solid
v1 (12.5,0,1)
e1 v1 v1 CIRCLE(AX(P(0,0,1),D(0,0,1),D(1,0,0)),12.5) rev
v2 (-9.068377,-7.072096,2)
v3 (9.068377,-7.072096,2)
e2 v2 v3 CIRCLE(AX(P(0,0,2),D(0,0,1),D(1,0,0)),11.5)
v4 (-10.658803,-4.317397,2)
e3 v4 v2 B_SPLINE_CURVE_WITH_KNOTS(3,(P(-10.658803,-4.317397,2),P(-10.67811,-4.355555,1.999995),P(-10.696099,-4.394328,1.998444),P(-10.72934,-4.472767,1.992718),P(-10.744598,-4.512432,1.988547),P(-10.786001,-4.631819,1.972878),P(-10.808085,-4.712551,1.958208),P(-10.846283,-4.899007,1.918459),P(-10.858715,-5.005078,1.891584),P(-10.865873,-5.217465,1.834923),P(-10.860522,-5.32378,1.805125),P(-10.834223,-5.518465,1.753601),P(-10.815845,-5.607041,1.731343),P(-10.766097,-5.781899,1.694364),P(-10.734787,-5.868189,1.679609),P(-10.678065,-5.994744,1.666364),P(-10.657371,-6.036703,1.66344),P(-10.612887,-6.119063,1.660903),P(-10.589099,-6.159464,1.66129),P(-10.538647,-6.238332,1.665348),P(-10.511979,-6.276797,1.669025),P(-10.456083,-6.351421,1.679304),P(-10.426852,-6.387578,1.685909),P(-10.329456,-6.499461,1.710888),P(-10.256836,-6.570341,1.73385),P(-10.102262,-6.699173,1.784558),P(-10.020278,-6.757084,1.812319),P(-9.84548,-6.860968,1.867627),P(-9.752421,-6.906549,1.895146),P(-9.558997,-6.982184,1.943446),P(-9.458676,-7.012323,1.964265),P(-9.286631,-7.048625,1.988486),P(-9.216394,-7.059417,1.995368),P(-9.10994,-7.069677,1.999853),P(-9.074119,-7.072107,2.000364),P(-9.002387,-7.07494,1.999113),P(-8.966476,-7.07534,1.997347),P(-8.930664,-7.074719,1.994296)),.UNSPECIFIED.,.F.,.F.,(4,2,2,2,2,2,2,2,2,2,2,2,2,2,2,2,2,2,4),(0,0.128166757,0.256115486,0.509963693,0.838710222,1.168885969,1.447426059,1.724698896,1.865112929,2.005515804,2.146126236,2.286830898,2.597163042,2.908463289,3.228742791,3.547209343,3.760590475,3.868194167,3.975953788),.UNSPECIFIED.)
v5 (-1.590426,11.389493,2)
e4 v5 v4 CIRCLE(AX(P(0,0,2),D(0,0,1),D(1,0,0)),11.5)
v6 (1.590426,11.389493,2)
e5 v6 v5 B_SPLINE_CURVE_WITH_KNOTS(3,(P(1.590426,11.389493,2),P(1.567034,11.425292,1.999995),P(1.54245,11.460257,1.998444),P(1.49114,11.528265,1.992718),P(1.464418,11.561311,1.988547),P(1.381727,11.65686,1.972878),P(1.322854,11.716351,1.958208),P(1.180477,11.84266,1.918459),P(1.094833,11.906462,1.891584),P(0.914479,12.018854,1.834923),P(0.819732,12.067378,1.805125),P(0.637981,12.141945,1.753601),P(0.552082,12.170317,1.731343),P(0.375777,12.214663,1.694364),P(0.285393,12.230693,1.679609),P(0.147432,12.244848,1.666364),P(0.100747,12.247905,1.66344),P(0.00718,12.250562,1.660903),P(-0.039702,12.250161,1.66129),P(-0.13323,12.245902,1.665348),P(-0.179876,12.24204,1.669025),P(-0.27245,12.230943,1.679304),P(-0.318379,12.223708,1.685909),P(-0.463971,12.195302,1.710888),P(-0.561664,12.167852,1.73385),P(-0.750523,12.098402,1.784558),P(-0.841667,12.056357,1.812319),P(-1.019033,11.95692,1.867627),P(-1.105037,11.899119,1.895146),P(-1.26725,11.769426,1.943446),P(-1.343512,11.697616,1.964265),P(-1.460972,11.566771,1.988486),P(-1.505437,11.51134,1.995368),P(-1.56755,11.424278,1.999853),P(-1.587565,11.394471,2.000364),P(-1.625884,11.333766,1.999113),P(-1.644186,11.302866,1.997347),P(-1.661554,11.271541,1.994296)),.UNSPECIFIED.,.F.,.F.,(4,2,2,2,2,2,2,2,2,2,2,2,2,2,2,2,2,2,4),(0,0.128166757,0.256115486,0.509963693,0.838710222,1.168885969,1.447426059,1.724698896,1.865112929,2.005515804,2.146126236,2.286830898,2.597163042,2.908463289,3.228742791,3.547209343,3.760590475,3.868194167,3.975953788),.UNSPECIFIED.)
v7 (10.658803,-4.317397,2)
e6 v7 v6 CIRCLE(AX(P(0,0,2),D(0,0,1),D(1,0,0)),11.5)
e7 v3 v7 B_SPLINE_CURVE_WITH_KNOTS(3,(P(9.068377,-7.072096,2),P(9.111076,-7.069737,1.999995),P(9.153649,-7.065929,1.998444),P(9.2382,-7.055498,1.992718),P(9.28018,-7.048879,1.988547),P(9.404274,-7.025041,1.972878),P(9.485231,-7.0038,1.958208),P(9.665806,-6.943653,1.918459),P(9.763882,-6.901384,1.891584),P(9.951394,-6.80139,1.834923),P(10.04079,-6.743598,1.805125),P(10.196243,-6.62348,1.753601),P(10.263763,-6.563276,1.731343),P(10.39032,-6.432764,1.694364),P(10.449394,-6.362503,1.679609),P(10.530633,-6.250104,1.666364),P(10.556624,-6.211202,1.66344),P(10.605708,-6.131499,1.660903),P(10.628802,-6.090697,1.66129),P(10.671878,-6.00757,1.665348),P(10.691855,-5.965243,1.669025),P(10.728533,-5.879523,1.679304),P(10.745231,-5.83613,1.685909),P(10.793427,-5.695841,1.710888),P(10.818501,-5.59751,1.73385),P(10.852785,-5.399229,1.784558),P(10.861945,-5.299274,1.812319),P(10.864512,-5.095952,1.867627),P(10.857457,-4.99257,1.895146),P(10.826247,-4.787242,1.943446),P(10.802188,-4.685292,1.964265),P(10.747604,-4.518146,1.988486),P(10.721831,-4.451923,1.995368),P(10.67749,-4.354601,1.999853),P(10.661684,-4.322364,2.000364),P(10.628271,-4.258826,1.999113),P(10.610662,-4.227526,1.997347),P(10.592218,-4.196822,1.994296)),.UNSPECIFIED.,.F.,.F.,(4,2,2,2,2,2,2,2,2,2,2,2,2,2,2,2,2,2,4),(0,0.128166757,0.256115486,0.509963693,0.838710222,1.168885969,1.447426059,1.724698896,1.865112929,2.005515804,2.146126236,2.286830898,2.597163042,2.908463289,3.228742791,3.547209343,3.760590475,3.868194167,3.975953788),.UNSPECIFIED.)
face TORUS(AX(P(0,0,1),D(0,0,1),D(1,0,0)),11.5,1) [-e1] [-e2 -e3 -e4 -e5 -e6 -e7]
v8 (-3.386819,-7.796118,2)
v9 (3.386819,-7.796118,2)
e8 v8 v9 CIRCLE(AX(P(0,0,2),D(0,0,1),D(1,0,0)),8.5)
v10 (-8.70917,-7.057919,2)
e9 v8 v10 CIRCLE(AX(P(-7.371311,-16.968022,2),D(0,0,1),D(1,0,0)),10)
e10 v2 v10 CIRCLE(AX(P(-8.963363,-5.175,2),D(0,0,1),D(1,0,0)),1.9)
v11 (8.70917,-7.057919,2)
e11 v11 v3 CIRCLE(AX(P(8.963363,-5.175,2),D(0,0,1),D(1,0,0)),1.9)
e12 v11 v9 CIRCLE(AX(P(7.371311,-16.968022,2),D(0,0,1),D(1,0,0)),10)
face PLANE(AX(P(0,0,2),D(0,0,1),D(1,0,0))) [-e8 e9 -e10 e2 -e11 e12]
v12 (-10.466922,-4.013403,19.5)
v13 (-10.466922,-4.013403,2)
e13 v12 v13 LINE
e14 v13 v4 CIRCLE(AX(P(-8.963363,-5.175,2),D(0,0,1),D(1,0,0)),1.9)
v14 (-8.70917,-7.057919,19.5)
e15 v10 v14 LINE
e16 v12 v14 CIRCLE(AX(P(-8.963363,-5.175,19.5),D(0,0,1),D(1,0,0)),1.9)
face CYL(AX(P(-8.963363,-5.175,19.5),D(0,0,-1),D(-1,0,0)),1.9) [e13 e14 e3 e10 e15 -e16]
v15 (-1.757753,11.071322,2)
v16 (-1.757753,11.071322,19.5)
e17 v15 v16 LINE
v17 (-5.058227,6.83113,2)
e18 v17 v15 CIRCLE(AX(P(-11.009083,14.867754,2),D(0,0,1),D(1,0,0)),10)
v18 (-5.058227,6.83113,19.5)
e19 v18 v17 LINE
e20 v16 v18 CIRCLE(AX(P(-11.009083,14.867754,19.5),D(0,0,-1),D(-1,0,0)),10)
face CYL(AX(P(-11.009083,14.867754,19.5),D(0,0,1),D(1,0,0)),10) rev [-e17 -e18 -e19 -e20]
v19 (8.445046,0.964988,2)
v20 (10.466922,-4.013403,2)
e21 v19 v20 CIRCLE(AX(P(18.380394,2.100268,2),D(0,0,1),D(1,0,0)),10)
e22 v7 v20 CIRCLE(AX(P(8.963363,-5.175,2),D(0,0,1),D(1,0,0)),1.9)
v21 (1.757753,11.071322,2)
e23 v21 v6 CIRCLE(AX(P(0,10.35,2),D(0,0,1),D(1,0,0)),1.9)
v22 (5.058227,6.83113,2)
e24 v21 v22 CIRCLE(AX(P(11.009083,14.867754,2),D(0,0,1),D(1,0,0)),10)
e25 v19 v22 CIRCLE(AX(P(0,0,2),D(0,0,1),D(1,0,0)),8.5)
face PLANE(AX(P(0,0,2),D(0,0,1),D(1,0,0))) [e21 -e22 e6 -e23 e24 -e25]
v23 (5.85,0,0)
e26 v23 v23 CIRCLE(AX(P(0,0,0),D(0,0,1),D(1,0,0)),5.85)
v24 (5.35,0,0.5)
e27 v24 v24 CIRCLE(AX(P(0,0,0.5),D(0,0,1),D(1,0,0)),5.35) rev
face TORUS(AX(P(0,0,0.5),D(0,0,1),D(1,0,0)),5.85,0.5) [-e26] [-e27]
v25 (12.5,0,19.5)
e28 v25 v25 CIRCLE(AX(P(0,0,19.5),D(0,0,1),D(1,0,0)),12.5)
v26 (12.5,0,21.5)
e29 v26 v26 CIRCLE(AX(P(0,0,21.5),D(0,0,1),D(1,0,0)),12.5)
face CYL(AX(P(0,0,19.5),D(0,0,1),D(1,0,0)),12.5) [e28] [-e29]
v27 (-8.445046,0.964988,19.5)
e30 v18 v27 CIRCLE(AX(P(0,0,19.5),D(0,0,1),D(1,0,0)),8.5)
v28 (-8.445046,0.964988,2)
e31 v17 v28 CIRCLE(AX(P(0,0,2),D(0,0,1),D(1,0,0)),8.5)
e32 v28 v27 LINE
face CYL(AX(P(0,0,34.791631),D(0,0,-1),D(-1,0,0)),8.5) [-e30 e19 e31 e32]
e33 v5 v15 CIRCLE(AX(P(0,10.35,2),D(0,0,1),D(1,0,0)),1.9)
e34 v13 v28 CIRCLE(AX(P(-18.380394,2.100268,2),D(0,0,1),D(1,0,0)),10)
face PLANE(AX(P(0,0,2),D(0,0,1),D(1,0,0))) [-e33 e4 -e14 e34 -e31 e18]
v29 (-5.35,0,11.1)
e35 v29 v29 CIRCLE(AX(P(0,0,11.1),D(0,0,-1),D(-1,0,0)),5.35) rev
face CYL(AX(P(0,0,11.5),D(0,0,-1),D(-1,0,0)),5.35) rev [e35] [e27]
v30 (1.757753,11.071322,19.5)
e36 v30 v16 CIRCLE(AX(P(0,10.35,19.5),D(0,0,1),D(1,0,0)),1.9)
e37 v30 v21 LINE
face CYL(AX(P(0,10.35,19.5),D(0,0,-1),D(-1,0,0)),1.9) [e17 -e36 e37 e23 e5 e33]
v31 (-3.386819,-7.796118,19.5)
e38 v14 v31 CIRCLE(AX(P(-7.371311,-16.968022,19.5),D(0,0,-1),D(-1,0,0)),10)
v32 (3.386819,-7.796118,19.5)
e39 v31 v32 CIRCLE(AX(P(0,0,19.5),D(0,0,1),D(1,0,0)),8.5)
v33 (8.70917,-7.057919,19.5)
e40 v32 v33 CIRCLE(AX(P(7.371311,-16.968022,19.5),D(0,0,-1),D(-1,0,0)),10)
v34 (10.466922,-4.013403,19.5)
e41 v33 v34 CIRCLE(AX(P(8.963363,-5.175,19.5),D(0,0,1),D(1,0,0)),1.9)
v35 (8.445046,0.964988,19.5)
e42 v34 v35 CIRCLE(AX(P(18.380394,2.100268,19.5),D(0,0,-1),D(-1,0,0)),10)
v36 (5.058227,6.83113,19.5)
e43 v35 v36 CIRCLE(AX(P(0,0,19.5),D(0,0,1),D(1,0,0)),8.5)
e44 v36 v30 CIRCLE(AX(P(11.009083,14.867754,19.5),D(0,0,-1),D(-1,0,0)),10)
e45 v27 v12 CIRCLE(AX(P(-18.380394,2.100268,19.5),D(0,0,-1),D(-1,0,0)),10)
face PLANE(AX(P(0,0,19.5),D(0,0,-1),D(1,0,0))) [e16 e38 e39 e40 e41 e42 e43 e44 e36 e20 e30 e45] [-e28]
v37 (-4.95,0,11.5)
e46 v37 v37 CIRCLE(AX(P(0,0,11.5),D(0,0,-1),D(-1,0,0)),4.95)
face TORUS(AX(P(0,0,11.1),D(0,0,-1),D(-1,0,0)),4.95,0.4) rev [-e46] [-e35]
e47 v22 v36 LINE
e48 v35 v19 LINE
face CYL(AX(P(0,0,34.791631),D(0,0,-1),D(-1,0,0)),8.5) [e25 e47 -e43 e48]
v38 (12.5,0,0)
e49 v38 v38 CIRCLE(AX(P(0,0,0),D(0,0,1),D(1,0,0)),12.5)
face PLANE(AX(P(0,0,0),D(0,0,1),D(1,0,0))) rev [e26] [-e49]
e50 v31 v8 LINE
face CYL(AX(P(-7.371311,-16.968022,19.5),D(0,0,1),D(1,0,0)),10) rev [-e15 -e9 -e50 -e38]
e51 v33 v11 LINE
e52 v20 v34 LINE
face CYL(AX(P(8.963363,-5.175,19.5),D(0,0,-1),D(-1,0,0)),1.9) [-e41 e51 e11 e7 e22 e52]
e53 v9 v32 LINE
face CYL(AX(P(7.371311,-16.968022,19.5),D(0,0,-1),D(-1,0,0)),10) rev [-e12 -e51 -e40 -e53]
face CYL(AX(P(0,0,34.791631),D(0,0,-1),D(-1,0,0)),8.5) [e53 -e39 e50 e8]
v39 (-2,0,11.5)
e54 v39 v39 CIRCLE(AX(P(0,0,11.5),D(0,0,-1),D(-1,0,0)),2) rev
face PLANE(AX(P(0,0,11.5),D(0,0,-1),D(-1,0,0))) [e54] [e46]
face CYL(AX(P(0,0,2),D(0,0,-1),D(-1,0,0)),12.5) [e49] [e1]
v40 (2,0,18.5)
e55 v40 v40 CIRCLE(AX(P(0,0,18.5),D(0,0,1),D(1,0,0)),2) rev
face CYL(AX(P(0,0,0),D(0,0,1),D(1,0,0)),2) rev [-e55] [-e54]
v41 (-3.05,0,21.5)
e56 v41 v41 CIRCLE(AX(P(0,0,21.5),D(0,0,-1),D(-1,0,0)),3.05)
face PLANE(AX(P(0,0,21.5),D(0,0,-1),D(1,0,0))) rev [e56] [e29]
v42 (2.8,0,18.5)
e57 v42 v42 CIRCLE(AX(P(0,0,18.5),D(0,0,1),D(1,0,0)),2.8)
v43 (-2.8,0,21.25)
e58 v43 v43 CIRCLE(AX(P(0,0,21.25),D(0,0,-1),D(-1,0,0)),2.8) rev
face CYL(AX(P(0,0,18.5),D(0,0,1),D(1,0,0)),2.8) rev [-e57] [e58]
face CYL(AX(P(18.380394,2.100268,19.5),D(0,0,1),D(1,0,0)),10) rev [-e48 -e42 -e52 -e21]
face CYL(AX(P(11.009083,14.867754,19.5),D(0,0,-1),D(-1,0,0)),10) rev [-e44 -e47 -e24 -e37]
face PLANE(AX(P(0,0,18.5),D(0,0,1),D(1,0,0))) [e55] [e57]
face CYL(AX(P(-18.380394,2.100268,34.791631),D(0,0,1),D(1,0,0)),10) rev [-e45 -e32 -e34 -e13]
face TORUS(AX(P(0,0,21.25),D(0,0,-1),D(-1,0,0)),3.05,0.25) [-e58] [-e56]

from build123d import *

# Parameters (mm, degrees)
SKETCH1_R           = 12.5
BOSS_EXTRUDE1_DEPTH = 2
SKETCH2_R           = 1.9
BOSS_EXTRUDE2_DEPTH = 17.5
SKETCH3_R           = 8.5
BOSS_EXTRUDE3_DEPTH = 8.75
SKETCH4_R           = 2
CUT_EXTRUDE1_DEPTH  = 28.834331319
SKETCH5_R           = 5.35
CUT_EXTRUDE2_DEPTH  = 11.5
FILLET1_R           = 0.5
SKETCH6_R           = 2.8
CUT_EXTRUDE3_DEPTH  = 3
FILLET2_R           = 0.25
FILLET3_R           = 10
FILLET4_R           = 10
FILLET5_R           = 10
FILLET6_R           = 10
FILLET7_R           = 10
FILLET8_R           = 10
FILLET9_R           = 1
FILLET10_R          = 0.4


with BuildPart() as part:
    # Sketch1 → Boss-Extrude1 (new body)
    with BuildSketch(Plane(origin=(0, 0, 0), x_dir=(0, 1, 0), z_dir=(0, 0, 1))):
        with Locations(Location((0, 0, 0), (0, 0, 270))):
            Circle(SKETCH1_R)
    boss_extrude1 = extrude(amount=BOSS_EXTRUDE1_DEPTH)

    # Sketch2 → Boss-Extrude2 (add)
    with BuildSketch(Plane.XY.offset(2)):
        with Locations((0, 10.35)):
            Circle(SKETCH2_R)
        with Locations((8.963362929, -5.175)):
            Circle(SKETCH2_R)
        with Locations((-8.963362929, -5.175)):
            Circle(SKETCH2_R)
    extrude(amount=BOSS_EXTRUDE2_DEPTH)

    # Sketch3 → Boss-Extrude3 (add)
    with BuildSketch(Plane.XY.offset(2)):
        Circle(SKETCH3_R)
    boss_extrude3 = extrude(amount=BOSS_EXTRUDE3_DEPTH)

    # Mirror2: Boss-Extrude1, Boss-Extrude3 across plane
    add(boss_extrude1.mirror(Plane.XY.offset(10.75)))
    add(boss_extrude3.mirror(Plane.XY.offset(10.75)))

    # Sketch4 → Cut-Extrude1 (cut, through all)
    with BuildSketch(Plane.XY.offset(21.5)):
        Circle(SKETCH4_R)
    extrude(amount=-CUT_EXTRUDE1_DEPTH, mode=Mode.SUBTRACT)

    # Sketch5 → Cut-Extrude2 (cut)
    with BuildSketch(Plane(origin=(0, 0, 0), x_dir=(1, 0, 0), z_dir=(0, 0, -1))):
        with Locations(Location((0, 0, 0), (0, 0, 180))):
            Circle(SKETCH5_R)
    extrude(amount=-CUT_EXTRUDE2_DEPTH, mode=Mode.SUBTRACT)

    # Fillet1
    fillet1_edges = [part.edges().sort_by_distance(p)[0] for p in [
        (5.35, 0, 0),
    ]]
    fillet(fillet1_edges, radius=FILLET1_R)

    # Sketch6 → Cut-Extrude3 (cut)
    with BuildSketch(Plane.XY.offset(21.5)):
        Circle(SKETCH6_R)
    extrude(amount=-CUT_EXTRUDE3_DEPTH, mode=Mode.SUBTRACT)

    # Fillet2
    fillet2_edges = [part.edges().sort_by_distance(p)[0] for p in [
        (-2.8, 0, 21.5),
    ]]
    fillet(fillet2_edges, radius=FILLET2_R)

    # Fillet3
    fillet3_edges = [part.edges().sort_by_distance(p)[0] for p in [
        (-7.549524157, -3.905724645, 10.75),
    ]]
    fillet(fillet3_edges, radius=FILLET3_R)

    # Fillet4
    fillet4_edges = [part.edges().sort_by_distance(p)[0] for p in [
        (-7.157218842, -4.585217384, 10.75),
    ]]
    fillet(fillet4_edges, radius=FILLET4_R)

    # Fillet5
    fillet5_edges = [part.edges().sort_by_distance(p)[0] for p in [
        (0.392305315, 8.490942029, 10.75),
    ]]
    fillet(fillet5_edges, radius=FILLET5_R)

    # Fillet6
    fillet6_edges = [part.edges().sort_by_distance(p)[0] for p in [
        (-0.392305315, 8.490942029, 10.75),
    ]]
    fillet(fillet6_edges, radius=FILLET6_R)

    # Fillet7
    fillet7_edges = [part.edges().sort_by_distance(p)[0] for p in [
        (7.549524157, -3.905724645, 10.75),
    ]]
    fillet(fillet7_edges, radius=FILLET7_R)

    # Fillet8
    fillet8_edges = [part.edges().sort_by_distance(p)[0] for p in [
        (7.157218842, -4.585217384, 10.75),
    ]]
    fillet(fillet8_edges, radius=FILLET8_R)

    # Fillet9
    # the kernel refuses this fillet: 1 mm, written as the material it takes off along each edge
    with BuildSketch(Plane(origin=(0, 0, 2), x_dir=(1, 0, 0), z_dir=(0, -1, 0))) as fillet9_piece_1_section:
        with BuildLine():
            CenterArc((12.5 - FILLET9_R, -FILLET9_R), FILLET9_R, 0, 90)
            Line((12.5, -FILLET9_R), (12.5, 0))
            Line((12.5, 0), (12.5 - FILLET9_R, 0))
        make_face()
    fillet9_piece_1 = revolve(axis=Axis((0, 0, 2), (0, 0, 1)), mode=Mode.PRIVATE)
    fillet9_piece_1 = fillet9_piece_1 - Plane(origin=(8.963362929, -5.175, 1.726039761), x_dir=(1, 0, 0), z_dir=(0, 0, -1)) * Cylinder(1.9, 51, mode=Mode.PRIVATE)
    fillet9_piece_1 = fillet9_piece_1 - Plane(origin=(-8.963362929, -5.175, 1.726039761), x_dir=(1, 0, 0), z_dir=(0, 0, -1)) * Cylinder(1.9, 51, mode=Mode.PRIVATE)
    fillet9_piece_1 = fillet9_piece_1 - Plane(origin=(0, 10.35, 1.726039761), x_dir=(1, 0, 0), z_dir=(0, 0, -1)) * Cylinder(1.9, 51, mode=Mode.PRIVATE)
    add(fillet9_piece_1, mode=Mode.SUBTRACT)

    # Fillet10
    fillet10_edges = [part.edges().sort_by_distance(p)[0] for p in [
        (5.35, 0, 11.5),
    ]]
    fillet(fillet10_edges, radius=FILLET10_R)


solid = part.part
